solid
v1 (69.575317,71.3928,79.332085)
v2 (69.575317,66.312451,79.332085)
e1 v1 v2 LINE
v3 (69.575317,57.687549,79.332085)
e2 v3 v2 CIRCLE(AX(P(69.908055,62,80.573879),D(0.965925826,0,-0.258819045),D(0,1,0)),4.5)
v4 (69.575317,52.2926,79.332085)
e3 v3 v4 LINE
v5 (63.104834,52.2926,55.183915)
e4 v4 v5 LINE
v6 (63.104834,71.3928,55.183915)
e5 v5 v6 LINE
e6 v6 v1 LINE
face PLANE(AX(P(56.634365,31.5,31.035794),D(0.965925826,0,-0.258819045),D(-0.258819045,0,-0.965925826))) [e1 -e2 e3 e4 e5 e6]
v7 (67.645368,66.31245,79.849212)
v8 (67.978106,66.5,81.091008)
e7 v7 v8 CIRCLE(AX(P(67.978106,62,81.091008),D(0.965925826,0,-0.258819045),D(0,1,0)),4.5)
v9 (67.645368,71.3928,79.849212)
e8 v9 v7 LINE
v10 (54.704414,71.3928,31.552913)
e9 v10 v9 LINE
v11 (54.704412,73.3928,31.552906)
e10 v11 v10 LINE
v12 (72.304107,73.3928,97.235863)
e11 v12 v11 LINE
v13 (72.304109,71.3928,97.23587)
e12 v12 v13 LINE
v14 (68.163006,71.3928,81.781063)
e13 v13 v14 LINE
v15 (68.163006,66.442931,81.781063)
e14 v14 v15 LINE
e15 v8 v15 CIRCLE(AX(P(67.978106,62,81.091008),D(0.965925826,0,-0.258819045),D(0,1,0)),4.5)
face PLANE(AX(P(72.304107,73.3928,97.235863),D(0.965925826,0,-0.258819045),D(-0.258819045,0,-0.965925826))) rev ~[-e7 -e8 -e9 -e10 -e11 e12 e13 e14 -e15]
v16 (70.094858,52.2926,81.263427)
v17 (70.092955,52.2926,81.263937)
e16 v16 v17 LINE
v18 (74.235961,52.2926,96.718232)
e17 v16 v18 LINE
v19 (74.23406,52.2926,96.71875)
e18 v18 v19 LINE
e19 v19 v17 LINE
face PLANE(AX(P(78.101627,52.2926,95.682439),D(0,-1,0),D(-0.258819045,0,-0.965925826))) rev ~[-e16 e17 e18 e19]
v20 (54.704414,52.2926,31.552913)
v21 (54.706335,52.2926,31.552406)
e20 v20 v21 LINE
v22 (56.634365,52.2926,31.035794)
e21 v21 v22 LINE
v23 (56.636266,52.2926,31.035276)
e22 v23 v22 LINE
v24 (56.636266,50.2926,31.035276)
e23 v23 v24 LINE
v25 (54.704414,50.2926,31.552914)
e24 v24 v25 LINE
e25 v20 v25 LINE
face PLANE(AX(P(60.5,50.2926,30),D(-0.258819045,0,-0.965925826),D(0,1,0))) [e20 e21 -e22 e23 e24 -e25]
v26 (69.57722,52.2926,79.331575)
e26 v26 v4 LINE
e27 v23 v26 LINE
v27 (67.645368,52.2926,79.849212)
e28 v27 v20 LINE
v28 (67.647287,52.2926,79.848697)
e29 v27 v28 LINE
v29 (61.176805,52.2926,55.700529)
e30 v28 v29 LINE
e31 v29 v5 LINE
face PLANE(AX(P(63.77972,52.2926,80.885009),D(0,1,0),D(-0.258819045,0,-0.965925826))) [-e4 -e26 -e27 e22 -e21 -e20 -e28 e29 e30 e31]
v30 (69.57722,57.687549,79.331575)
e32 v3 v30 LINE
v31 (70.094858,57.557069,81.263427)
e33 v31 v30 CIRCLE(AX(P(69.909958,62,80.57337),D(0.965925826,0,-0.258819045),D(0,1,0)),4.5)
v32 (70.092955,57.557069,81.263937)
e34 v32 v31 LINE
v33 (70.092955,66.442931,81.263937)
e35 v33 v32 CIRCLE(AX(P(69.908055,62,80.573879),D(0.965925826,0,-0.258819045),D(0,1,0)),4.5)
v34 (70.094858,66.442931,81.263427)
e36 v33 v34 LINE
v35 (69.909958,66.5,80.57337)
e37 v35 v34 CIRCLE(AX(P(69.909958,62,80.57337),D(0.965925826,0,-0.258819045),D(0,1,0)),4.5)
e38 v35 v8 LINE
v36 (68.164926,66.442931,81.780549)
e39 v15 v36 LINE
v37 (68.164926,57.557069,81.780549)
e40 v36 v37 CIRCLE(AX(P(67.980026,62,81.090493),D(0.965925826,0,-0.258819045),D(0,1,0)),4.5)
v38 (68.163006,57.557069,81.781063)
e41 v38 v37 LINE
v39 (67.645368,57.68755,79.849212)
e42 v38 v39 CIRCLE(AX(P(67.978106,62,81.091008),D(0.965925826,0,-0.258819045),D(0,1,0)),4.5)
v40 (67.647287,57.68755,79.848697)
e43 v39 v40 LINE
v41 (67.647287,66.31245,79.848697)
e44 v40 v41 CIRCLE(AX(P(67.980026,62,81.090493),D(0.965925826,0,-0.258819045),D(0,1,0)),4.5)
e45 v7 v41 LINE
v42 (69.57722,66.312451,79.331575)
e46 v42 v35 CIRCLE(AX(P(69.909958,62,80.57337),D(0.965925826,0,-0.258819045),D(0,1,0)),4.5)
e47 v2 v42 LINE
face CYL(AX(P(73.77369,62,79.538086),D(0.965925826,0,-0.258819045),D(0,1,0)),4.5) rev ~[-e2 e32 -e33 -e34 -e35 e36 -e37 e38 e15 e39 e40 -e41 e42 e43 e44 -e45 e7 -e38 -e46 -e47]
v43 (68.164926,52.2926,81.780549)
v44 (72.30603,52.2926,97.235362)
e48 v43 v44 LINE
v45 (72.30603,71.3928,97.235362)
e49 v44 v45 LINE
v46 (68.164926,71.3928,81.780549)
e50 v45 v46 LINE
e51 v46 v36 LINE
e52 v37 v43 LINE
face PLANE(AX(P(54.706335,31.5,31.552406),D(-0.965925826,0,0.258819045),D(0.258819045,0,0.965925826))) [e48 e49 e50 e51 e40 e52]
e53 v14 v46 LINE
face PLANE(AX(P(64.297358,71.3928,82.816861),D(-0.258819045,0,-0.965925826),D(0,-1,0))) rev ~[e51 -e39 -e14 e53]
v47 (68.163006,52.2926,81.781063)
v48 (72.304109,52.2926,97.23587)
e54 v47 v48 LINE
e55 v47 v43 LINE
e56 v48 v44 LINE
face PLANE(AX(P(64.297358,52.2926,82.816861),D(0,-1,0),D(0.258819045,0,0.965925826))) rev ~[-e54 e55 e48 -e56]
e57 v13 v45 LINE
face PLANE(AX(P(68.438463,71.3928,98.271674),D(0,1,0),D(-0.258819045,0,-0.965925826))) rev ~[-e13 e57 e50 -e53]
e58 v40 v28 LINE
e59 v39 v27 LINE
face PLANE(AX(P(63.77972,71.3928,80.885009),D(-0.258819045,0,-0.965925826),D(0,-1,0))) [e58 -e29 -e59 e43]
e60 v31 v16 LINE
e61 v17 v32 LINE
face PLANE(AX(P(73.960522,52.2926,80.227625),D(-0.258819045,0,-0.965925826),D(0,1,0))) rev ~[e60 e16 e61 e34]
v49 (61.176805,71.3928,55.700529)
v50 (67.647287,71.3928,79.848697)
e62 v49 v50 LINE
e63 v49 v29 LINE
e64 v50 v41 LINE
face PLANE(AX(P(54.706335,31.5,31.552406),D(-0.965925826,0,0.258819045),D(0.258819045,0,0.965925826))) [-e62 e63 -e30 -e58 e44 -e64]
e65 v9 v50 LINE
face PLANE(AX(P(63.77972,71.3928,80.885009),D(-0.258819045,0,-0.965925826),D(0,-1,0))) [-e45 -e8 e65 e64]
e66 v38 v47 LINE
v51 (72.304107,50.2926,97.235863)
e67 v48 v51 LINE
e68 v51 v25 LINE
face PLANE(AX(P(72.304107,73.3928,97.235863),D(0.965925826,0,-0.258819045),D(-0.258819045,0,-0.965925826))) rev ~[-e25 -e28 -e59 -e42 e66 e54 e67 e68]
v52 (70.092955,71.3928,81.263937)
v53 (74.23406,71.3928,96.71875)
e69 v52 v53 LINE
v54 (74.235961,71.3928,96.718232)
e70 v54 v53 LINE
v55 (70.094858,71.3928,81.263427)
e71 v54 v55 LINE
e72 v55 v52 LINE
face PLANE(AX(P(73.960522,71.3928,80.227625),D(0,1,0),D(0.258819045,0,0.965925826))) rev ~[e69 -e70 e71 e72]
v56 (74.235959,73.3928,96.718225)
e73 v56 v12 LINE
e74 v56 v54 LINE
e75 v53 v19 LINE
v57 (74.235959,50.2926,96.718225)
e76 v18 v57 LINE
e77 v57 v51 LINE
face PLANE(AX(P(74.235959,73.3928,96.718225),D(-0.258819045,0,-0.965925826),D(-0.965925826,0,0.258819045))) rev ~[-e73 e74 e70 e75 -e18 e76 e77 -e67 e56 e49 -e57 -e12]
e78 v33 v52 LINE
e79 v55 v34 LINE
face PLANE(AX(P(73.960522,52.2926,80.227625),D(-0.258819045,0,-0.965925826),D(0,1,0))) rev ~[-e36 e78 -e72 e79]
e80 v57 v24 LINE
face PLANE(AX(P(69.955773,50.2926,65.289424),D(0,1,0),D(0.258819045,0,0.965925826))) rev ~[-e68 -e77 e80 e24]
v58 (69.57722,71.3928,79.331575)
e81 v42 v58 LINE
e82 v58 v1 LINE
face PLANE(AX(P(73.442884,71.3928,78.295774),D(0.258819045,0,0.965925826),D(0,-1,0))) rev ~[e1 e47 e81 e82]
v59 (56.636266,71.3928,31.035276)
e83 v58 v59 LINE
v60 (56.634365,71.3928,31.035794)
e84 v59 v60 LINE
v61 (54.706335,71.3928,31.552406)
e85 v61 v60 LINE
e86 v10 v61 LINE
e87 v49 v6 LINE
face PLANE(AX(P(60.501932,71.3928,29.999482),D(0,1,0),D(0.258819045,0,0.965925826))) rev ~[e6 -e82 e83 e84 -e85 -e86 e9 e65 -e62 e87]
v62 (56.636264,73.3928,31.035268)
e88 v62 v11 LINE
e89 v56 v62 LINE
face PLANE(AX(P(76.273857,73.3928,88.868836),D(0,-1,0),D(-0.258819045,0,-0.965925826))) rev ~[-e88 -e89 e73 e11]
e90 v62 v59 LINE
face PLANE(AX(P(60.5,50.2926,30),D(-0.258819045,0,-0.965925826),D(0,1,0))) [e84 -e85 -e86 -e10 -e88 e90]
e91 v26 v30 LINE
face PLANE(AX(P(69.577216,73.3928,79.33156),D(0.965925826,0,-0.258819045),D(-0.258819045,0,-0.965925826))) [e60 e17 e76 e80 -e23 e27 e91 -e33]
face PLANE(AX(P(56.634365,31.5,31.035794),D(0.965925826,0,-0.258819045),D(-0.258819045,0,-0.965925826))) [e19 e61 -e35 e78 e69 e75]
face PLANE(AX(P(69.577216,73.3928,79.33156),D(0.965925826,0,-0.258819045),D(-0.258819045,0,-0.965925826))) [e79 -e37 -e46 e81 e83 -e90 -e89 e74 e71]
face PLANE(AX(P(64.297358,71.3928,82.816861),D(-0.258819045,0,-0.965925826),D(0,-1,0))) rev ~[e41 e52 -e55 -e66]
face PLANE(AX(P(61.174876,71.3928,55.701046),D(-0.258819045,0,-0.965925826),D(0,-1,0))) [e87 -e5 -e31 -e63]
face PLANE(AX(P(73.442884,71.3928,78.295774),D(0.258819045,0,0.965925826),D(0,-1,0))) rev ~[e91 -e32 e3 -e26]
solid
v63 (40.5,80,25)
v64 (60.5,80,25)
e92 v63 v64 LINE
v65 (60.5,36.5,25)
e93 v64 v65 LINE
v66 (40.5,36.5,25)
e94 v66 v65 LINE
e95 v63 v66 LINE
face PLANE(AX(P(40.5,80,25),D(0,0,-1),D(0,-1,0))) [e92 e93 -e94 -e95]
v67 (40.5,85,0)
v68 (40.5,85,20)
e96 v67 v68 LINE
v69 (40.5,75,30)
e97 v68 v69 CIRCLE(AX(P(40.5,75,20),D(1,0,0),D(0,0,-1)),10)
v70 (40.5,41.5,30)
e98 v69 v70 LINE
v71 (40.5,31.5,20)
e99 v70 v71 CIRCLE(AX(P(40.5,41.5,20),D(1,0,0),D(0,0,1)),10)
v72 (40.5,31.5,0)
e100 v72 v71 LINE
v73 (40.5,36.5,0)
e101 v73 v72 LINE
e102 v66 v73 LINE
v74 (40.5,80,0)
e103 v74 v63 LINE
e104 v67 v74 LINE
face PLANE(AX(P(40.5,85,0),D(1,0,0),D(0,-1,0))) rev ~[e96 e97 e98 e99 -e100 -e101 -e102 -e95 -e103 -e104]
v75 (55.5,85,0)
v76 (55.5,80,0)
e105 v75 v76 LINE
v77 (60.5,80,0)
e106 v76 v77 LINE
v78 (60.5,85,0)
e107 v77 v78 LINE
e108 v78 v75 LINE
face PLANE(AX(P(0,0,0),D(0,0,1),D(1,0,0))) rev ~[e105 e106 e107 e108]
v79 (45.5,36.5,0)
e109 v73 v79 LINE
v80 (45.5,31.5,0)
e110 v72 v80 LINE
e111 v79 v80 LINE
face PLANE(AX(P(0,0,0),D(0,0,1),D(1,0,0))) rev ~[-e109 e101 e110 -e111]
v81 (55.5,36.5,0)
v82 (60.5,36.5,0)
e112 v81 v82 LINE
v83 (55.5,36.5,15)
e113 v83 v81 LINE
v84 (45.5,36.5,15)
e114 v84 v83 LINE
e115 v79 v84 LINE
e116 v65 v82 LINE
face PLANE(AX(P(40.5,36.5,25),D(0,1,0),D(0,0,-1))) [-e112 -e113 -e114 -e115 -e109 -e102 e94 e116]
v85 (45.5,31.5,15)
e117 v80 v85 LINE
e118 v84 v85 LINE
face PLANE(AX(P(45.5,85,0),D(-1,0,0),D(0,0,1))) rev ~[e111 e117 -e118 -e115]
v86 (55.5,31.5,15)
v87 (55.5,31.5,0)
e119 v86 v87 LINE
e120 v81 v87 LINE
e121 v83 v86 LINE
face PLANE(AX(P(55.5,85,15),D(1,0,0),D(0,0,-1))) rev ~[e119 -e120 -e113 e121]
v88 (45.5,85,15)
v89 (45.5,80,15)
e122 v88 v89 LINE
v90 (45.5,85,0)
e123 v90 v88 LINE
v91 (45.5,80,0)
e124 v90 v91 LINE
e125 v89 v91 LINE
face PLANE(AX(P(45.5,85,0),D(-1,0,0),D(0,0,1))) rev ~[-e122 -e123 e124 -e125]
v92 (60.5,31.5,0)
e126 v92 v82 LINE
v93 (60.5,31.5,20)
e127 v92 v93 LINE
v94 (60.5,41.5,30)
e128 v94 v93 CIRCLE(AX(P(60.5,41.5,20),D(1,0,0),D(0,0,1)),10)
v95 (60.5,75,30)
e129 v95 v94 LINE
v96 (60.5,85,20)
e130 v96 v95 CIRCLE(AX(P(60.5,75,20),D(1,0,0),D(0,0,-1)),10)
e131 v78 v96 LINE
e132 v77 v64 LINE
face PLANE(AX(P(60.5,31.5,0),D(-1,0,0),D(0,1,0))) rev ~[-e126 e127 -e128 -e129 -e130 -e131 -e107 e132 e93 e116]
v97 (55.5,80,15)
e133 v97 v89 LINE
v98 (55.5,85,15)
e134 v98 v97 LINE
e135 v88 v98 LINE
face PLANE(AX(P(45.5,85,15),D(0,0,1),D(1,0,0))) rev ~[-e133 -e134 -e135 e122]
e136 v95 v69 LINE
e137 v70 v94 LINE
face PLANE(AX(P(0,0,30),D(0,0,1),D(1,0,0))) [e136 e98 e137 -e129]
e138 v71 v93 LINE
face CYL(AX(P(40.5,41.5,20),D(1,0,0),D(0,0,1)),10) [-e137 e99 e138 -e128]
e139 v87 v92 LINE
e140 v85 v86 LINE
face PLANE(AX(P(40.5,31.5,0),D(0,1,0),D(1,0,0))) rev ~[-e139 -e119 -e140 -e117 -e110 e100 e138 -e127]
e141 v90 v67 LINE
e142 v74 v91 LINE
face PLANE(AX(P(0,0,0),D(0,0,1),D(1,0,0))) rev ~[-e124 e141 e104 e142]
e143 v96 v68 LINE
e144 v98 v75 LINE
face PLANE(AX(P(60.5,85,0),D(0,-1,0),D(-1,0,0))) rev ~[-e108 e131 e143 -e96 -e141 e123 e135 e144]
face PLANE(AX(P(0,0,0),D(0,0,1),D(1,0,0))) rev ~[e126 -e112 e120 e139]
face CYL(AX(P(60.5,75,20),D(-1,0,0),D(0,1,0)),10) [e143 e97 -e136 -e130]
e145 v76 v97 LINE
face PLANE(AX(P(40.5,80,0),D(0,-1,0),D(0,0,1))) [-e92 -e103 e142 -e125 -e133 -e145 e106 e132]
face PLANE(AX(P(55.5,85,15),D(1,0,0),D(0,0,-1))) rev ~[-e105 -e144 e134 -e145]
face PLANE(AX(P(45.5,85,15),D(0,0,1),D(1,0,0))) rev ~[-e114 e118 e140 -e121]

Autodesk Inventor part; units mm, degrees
ref_plane "YZ Plane" through (0, 0, 0) normal (1, 0, 0) x (0, 1, 0)
ref_plane "XZ Plane" through (0, 0, 0) normal (0, 1, 0) x (-1, 0, 0)
ref_plane "XY Plane" through (0, 0, 0) normal (0, 0, 1) x (1, 0, 0)
ref_plane "РабПлоскость1" through (0, 0, 0) normal (0, 0, 1) x (1, 0, 0)
sketch "Эскиз1" plane through (0, 0, 0) normal (0, 0, 1) x (1, 0, 0)
  line L0 (63.5, 74.8221) -> (63.5, 48.8221) projected
  line L1 (60.5, 48.8221) -> (60.5, 74.8221) projected
  line L2 (123.5, 102) -> (-123.5, 102) projected
  line L3 (43.5, 11.5) -> (33.5, 11.5) projected
  line L4 (68.5, 11.5) -> (43.5, 11.5) projected
  line L5 (40.5, 31.5) -> (60.5, 31.5)
  line L6 (60.5, 31.5) -> (60.5, 85)
  line L7 (60.5, 85) -> (40.5, 85)
  line L8 (40.5, 85) -> (40.5, 31.5)
  point P0 (0, 0)
  dimension "d0" = 20
  dimension "d1" = 17
  dimension "d2" = 0
  dimension "d3" = 20
extrude "Выдавливание1" add sketch "Эскиз1" along normal blind 30
ref_plane "РабПлоскость2" through (60.5, 31.5, 30) normal (-0.9659258, 0, 0.258819) x (0, 1, 0)
sketch "Эскиз2" plane through (60.5, 31.5, 30) normal (-0.9659258, 0, 0.258819) x (0, 1, 0)
  line L0 (46.5, -71.3991) -> (65.5, -71.3991) projected
  ellipse E0 centre (65.5, -66.5694) end of major axis (70.5, -66.5694) minor radius 4.8296 (65.5, -71.3991) -> (70.5, -66.5694) ccw projected
  line L1 (70.5, -66.5694) -> (70.5, -56.9102) projected
  ellipse E1 centre (65.5, -56.9102) end of major axis (70.5, -56.9102) minor radius 4.8296 (70.5, -56.9102) -> (65.5, -52.0805) ccw projected
  line L2 (65.5, -52.0805) -> (54.0465, -52.0805) projected
  ellipse E2 centre (54.0465, -42.4213) end of major axis (64.0465, -42.4213) minor radius 9.6593 (44.7292, -45.9289) -> (54.0465, -52.0805) ccw projected
  ellipse E3 centre (30.5, -51.2856) end of major axis (45.7717, -51.2856) minor radius 14.7513 (44.7292, -45.9289) -> (30.5, -36.5343) ccw projected
  line L3 (30.5, -36.5343) -> (-7.5, -36.5343) projected
  line L4 (-7.5, -36.5343) -> (-7.5, -31.008) projected
  ellipse E4 centre (6.5042, -17.2158) end of major axis (26.5042, -17.2158) minor radius 19.3185 (-12.2897, -23.8231) -> (-7.5, -31.008) ccw projected
  line L5 (-12.2897, -23.8231) -> (-15.4018, -15.5639) projected
  ellipse E5 centre (-20.1003, -17.2158) end of major axis (-15.1003, -17.2158) minor radius 4.8296 (-15.4018, -15.5639) -> (-20.1003, -12.3861) ccw projected
  line L6 (-20.1003, -12.3861) -> (-40.9046, -12.3861) projected
  ellipse E6 centre (-40.9046, -17.2158) end of major axis (-45.9046, -17.2158) minor radius 4.8296 (-40.9046, -12.3861) -> (-45.8286, -16.3771) ccw projected
  line L7 (-45.8286, -16.3771) -> (-50.2368, -40.5253) projected
  line L8 (-50.2368, -40.5253) -> (-52.0642, -60.7008) projected
  ellipse E7 centre (-47.0832, -61.1217) end of major axis (-52.0832, -61.1217) minor radius 4.8296 (-52.0642, -60.7008) -> (-47.519, -65.933) ccw projected
  line L9 (-47.519, -65.933) -> (14.9298, -71.2104) projected
  ellipse E8 centre (14.0582, -80.8329) end of major axis (4.0582, -80.8329) minor radius 9.6593 (18.7926, -72.3248) -> (14.9298, -71.2104) ccw projected
  ellipse E9 centre (30.5, -51.2856) end of major axis (55.2283, -51.2856) minor radius 23.8857 (18.7926, -72.3248) -> (41.8928, -72.4853) ccw projected
  ellipse E10 centre (46.5, -81.0583) end of major axis (36.5, -81.0583) minor radius 9.6593 (46.5, -71.3991) -> (41.8928, -72.4853) ccw projected
  ellipse E11 centre (30.3221, -55.759) end of major axis (33.8221, -55.759) minor radius 3.3807 projected
  line L10 (0, 0) -> (53.5, 0) projected
  line L11 (41.8928, 0) -> (18.7926, 0)
  line L12 (18.7926, 0) -> (18.7926, -70)
  line L13 (18.7926, -70) -> (41.8928, -70)
  line L14 (41.8928, -70) -> (41.8928, 0)
  circle A0 centre (30.5, -51.2856) radius 4.5
  ellipse E12 centre (30.3619, -58.823) end of major axis (44.3161, -58.823) minor radius 13.4788 (17.3132, -63.5994) -> (17.3137, -63.6006) ccw projected
  ellipse E13 centre (20.8132, -63.6558) end of major axis (17.3132, -63.6558) minor radius 3.3807 (18.8684, -66.4666) -> (17.3137, -63.6006) ccw projected
  ellipse E14 centre (30.3619, -58.823) end of major axis (44.3161, -58.823) minor radius 13.4788 (18.8684, -66.4666) -> (41.8272, -66.506) ccw projected
  ellipse E15 centre (39.8691, -63.7038) end of major axis (36.3691, -63.7038) minor radius 3.3807 (43.3691, -63.7038) -> (41.8272, -66.506) ccw projected
  line L15 (43.3691, -63.7038) -> (43.3691, -65.0724) projected
  ellipse E16 centre (30.3619, -60.1915) end of major axis (16.4077, -60.1915) minor radius 13.4788 (42.4671, -66.8966) -> (43.3691, -65.0724) ccw projected
  ellipse E17 centre (30.3619, -60.1915) end of major axis (16.4077, -60.1915) minor radius 13.4788 (18.2308, -66.8526) -> (42.4671, -66.8966) ccw projected
  ellipse E18 centre (30.3619, -60.1915) end of major axis (16.4077, -60.1915) minor radius 13.4788 (17.3132, -64.968) -> (18.2308, -66.8526) ccw projected
  line L16 (17.3132, -64.968) -> (17.3132, -63.6558) projected
  line L17 (17.3132, -63.6558) -> (17.3132, -63.5994) projected
  line L18 (25.6422, -60.4178) -> (35.002, -60.4178) projected
  ellipse E19 centre (30.3221, -64.0447) end of major axis (36.3221, -64.0447) minor radius 5.7956 (25.6422, -60.4178) -> (35.002, -60.4178) ccw projected
  point P0 (-31.5, 44.6363)
  dimension "d7" = 70
  dimension "d28" = 9
extrude "Выдавливание2" add sketch "Эскиз2" along normal blind 10 contours L14 E15 E14 L13 E13 L12 L3 E3 | E3 L3 L12 L10 L14 | L14 E17 L13 E14 E15 | L14 L13 E17 | E13 E14 L13 E17 L12 | E17 L13 L12 | E11 A0 | L18 E19 picked at (30.1856, -56.8739)
sketch "Эскиз3" plane through (50.8407, 31.5, 32.5882) normal (-0.9659258, 0, 0.258819) x (0.258819, 0, 0.9659258)
  line L0 (70, 41.8928) -> (0, 41.8928) projected
  line L1 (0, 18.7926) -> (70, 18.7926) projected
  line L2 (70, 18.7926) -> (70, 41.8928) projected
  line L3 (0, 18.7926) -> (0, 41.8928) projected
  line L4 (0, 39.8928) -> (50, 39.8928)
  line L5 (50, 39.8928) -> (50, 20.7926)
  line L6 (50, 20.7926) -> (0, 20.7926)
  line L7 (0, 20.7926) -> (0, 39.8928)
  line L8 (50, 20.7926) -> (68, 20.7926)
  line L9 (68, 20.7926) -> (68, 39.8928)
  line L10 (68, 39.8928) -> (50, 39.8928)
  line L11 (52, 39.8928) -> (52, 20.7926)
  point P0 (-44.6363, -31.5)
  dimension "d10" = 2
  dimension "d11" = 2
  dimension "d12" = 2
  dimension "d13" = 50
  dimension "d14" = 2
extrude "Выдавливание3" cut sketch "Эскиз3" against normal blind 4 contours L4 L5 L6 L3 | L10 L9 L8 L11
sketch "Эскиз4" plane through (60.5, 31.5, 30) normal (0.9659258, 0, -0.258819) x (-0.258819, 0, -0.9659258)
  line L0 (-50, 20.7926) -> (0, 20.7926) projected
  line L1 (-68, 20.7926) -> (-52, 20.7926) projected
  line L2 (-68, 39.8928) -> (-68, 20.7926) projected
  line L3 (-52, 39.8928) -> (-68, 39.8928) projected
  line L4 (0, 39.8928) -> (-50, 39.8928) projected
  line L5 (-50, 39.8928) -> (-50, 20.7926) projected
  line L6 (-52, 20.7926) -> (-52, 39.8928) projected
  line L7 (0, 20.7926) -> (0, 39.8928)
  line L8 (0, 18.7926) -> (0, 41.8928) projected
  point P0 (44.6363, -31.5)
extrude "Выдавливание4" cut sketch "Эскиз4" against normal blind 4
sketch "Эскиз5" plane through (78.6173, 73.3928, 97.6148) normal (0, 1, 0) x (0.9659258, 0, -0.258819)
  line L0 (-4, 20) -> (-4, 70) projected
  line L1 (-6, 70) -> (-6, 20) projected
  line L2 (-6, 2) -> (-6, 18) projected
  line L3 (-4, 18) -> (-4, 2) projected
  line L4 (-10, 20) -> (-6, 20) projected
  line L5 (-10, 18) -> (-6, 18) projected
  line L6 (0, 18) -> (-4, 18) projected
  line L7 (0, 20) -> (-4, 20) projected
  line L8 (0, 70) -> (-10, 70) projected
  line L9 (0, 0) -> (-10, 0) projected
  line L10 (-2, 70) -> (-8, 70)
  line L11 (-8, 70) -> (-8, 0)
  line L12 (-8, 0) -> (-2, 0)
  line L13 (-2, 0) -> (-2, 70)
  line L14 (0, 0) -> (0, 70) projected
  line L15 (-10, 0) -> (-10, 70) projected
  line L16 (-4, 2) -> (-6, 2)
  line L17 (0, 0) -> (-10, 0) projected
  line L18 (-6, 70) -> (-4, 70)
  line L19 (-4, 70) -> (-4, 20)
  line L20 (-2, 20) -> (-4, 20)
  line L21 (-6, 20) -> (-6, 70) projected
  line L22 (-6, 20) -> (-8, 20)
  line L23 (-6, 20) -> (-6, 70)
  line L24 (0, 70) -> (-10, 70) projected
  line L25 (-6, 18) -> (-6, 2) projected
  line L26 (-6, 20) -> (-6, 2)
  line L27 (-4, 2) -> (-4, 18) projected
  line L28 (-6, 2) -> (-4, 2)
  line L29 (-4, 2) -> (-4, 20.7345)
  point P0 (-50.6739, 114.6363)
  point P1 (-4, 20)
  point P2 (-4, 18)
  point P3 (-6, 18)
  dimension "d19" = 2
  dimension "d20" = 2
extrude "Выдавливание5" cut sketch "Эскиз5" against normal through all contours L0 L8 L13 L7 | L7 L13 L6 L29 | L13 L8 L14 L7 | L7 L14 L6 L13 | L6 L13 L9 L11 L5 L2 L16 L3 | L6 L14 L9 L13 | L1 L4 L11 L8 | L26 L5 L11 L4 | L11 L4 L15 L8 | L9 L15 L5 L11 | L11 L5 L15 L4
sketch "Эскиз6" plane through (54.7044, 31.5, 31.5529) normal (-0.9659258, 0, 0.258819) x (0.258819, 0, 0.9659258)
  line L0 (68, 41.8928) -> (68, 18.7926) projected
  line L1 (0, 41.8928) -> (68, 41.8928) projected
  line L2 (0, 18.7926) -> (0, 41.8928) projected
  line L3 (68, 18.7926) -> (0, 18.7926) projected
  line L4 (0, 0) -> (0, 53.5) projected
  line L5 (0, 39.8928) -> (25, 39.8928)
  line L6 (25, 39.8928) -> (25, 20.7926)
  line L7 (25, 20.7926) -> (0, 20.7926)
  line L8 (0, 20.7926) -> (0, 39.8928)
  point P0 (-44.6363, -31.5)
  point P1 (0, 20.7926)
  dimension "d23" = 25
  dimension "d24" = 2
  dimension "d25" = 2
extrude "Выдавливание6" cut sketch "Эскиз6" against normal through all contours L5 L6 L7 L2
sketch "Эскиз7" plane through (40.5, 31.5, 0) normal (-1, 0, 0) x (0, 0, 1)
  line L0 (0, 0) -> (0, 53.5) projected
  line L1 (0, 48.5) -> (25, 48.5)
  line L2 (25, 48.5) -> (25, 5)
  line L3 (25, 5) -> (0, 5)
  line L4 (0, 5) -> (0, 48.5)
  line L5 (30, 53.5) -> (30, 0) projected
  line L6 (0, 53.5) -> (30, 53.5) projected
  line L7 (0, 0) -> (30, 0) projected
  point P0 (0, -31.5)
  point P1 (0, 5)
  dimension "d29" = 5
  dimension "d30" = 5
  dimension "d31" = 5
extrude "Выдавливание7" cut sketch "Эскиз7" against normal through all contours L0 L1 L2 L3
fillet "Сопряжение1" radius 10 2 edges at (50.5, 85, 30) (50.5, 31.5, 30)
sketch "Эскиз8" plane through (40.5, 85, 0) normal (0, 1, 0) x (1, 0, 0)
  line L0 (20, 0) -> (0, 0) projected
  line L1 (15, 0) -> (5, 0)
  line L2 (5, 0) -> (5, -15)
  line L3 (5, -15) -> (15, -15)
  line L4 (15, -15) -> (15, 0)
  line L5 (20, -20) -> (0, -20) projected
  line L6 (0, 0) -> (0, -20) projected
  line L7 (20, 0) -> (20, -20) projected
  point P0 (-40.5, 0)
  point P1 (5, 0)
  dimension "d35" = 5
  dimension "d36" = 5
  dimension "d37" = 5
extrude "Выдавливание8" cut sketch "Эскиз8" against normal through all contours L4 L3 L2 L0
properties part number "Кранштейн сервомоторов"
